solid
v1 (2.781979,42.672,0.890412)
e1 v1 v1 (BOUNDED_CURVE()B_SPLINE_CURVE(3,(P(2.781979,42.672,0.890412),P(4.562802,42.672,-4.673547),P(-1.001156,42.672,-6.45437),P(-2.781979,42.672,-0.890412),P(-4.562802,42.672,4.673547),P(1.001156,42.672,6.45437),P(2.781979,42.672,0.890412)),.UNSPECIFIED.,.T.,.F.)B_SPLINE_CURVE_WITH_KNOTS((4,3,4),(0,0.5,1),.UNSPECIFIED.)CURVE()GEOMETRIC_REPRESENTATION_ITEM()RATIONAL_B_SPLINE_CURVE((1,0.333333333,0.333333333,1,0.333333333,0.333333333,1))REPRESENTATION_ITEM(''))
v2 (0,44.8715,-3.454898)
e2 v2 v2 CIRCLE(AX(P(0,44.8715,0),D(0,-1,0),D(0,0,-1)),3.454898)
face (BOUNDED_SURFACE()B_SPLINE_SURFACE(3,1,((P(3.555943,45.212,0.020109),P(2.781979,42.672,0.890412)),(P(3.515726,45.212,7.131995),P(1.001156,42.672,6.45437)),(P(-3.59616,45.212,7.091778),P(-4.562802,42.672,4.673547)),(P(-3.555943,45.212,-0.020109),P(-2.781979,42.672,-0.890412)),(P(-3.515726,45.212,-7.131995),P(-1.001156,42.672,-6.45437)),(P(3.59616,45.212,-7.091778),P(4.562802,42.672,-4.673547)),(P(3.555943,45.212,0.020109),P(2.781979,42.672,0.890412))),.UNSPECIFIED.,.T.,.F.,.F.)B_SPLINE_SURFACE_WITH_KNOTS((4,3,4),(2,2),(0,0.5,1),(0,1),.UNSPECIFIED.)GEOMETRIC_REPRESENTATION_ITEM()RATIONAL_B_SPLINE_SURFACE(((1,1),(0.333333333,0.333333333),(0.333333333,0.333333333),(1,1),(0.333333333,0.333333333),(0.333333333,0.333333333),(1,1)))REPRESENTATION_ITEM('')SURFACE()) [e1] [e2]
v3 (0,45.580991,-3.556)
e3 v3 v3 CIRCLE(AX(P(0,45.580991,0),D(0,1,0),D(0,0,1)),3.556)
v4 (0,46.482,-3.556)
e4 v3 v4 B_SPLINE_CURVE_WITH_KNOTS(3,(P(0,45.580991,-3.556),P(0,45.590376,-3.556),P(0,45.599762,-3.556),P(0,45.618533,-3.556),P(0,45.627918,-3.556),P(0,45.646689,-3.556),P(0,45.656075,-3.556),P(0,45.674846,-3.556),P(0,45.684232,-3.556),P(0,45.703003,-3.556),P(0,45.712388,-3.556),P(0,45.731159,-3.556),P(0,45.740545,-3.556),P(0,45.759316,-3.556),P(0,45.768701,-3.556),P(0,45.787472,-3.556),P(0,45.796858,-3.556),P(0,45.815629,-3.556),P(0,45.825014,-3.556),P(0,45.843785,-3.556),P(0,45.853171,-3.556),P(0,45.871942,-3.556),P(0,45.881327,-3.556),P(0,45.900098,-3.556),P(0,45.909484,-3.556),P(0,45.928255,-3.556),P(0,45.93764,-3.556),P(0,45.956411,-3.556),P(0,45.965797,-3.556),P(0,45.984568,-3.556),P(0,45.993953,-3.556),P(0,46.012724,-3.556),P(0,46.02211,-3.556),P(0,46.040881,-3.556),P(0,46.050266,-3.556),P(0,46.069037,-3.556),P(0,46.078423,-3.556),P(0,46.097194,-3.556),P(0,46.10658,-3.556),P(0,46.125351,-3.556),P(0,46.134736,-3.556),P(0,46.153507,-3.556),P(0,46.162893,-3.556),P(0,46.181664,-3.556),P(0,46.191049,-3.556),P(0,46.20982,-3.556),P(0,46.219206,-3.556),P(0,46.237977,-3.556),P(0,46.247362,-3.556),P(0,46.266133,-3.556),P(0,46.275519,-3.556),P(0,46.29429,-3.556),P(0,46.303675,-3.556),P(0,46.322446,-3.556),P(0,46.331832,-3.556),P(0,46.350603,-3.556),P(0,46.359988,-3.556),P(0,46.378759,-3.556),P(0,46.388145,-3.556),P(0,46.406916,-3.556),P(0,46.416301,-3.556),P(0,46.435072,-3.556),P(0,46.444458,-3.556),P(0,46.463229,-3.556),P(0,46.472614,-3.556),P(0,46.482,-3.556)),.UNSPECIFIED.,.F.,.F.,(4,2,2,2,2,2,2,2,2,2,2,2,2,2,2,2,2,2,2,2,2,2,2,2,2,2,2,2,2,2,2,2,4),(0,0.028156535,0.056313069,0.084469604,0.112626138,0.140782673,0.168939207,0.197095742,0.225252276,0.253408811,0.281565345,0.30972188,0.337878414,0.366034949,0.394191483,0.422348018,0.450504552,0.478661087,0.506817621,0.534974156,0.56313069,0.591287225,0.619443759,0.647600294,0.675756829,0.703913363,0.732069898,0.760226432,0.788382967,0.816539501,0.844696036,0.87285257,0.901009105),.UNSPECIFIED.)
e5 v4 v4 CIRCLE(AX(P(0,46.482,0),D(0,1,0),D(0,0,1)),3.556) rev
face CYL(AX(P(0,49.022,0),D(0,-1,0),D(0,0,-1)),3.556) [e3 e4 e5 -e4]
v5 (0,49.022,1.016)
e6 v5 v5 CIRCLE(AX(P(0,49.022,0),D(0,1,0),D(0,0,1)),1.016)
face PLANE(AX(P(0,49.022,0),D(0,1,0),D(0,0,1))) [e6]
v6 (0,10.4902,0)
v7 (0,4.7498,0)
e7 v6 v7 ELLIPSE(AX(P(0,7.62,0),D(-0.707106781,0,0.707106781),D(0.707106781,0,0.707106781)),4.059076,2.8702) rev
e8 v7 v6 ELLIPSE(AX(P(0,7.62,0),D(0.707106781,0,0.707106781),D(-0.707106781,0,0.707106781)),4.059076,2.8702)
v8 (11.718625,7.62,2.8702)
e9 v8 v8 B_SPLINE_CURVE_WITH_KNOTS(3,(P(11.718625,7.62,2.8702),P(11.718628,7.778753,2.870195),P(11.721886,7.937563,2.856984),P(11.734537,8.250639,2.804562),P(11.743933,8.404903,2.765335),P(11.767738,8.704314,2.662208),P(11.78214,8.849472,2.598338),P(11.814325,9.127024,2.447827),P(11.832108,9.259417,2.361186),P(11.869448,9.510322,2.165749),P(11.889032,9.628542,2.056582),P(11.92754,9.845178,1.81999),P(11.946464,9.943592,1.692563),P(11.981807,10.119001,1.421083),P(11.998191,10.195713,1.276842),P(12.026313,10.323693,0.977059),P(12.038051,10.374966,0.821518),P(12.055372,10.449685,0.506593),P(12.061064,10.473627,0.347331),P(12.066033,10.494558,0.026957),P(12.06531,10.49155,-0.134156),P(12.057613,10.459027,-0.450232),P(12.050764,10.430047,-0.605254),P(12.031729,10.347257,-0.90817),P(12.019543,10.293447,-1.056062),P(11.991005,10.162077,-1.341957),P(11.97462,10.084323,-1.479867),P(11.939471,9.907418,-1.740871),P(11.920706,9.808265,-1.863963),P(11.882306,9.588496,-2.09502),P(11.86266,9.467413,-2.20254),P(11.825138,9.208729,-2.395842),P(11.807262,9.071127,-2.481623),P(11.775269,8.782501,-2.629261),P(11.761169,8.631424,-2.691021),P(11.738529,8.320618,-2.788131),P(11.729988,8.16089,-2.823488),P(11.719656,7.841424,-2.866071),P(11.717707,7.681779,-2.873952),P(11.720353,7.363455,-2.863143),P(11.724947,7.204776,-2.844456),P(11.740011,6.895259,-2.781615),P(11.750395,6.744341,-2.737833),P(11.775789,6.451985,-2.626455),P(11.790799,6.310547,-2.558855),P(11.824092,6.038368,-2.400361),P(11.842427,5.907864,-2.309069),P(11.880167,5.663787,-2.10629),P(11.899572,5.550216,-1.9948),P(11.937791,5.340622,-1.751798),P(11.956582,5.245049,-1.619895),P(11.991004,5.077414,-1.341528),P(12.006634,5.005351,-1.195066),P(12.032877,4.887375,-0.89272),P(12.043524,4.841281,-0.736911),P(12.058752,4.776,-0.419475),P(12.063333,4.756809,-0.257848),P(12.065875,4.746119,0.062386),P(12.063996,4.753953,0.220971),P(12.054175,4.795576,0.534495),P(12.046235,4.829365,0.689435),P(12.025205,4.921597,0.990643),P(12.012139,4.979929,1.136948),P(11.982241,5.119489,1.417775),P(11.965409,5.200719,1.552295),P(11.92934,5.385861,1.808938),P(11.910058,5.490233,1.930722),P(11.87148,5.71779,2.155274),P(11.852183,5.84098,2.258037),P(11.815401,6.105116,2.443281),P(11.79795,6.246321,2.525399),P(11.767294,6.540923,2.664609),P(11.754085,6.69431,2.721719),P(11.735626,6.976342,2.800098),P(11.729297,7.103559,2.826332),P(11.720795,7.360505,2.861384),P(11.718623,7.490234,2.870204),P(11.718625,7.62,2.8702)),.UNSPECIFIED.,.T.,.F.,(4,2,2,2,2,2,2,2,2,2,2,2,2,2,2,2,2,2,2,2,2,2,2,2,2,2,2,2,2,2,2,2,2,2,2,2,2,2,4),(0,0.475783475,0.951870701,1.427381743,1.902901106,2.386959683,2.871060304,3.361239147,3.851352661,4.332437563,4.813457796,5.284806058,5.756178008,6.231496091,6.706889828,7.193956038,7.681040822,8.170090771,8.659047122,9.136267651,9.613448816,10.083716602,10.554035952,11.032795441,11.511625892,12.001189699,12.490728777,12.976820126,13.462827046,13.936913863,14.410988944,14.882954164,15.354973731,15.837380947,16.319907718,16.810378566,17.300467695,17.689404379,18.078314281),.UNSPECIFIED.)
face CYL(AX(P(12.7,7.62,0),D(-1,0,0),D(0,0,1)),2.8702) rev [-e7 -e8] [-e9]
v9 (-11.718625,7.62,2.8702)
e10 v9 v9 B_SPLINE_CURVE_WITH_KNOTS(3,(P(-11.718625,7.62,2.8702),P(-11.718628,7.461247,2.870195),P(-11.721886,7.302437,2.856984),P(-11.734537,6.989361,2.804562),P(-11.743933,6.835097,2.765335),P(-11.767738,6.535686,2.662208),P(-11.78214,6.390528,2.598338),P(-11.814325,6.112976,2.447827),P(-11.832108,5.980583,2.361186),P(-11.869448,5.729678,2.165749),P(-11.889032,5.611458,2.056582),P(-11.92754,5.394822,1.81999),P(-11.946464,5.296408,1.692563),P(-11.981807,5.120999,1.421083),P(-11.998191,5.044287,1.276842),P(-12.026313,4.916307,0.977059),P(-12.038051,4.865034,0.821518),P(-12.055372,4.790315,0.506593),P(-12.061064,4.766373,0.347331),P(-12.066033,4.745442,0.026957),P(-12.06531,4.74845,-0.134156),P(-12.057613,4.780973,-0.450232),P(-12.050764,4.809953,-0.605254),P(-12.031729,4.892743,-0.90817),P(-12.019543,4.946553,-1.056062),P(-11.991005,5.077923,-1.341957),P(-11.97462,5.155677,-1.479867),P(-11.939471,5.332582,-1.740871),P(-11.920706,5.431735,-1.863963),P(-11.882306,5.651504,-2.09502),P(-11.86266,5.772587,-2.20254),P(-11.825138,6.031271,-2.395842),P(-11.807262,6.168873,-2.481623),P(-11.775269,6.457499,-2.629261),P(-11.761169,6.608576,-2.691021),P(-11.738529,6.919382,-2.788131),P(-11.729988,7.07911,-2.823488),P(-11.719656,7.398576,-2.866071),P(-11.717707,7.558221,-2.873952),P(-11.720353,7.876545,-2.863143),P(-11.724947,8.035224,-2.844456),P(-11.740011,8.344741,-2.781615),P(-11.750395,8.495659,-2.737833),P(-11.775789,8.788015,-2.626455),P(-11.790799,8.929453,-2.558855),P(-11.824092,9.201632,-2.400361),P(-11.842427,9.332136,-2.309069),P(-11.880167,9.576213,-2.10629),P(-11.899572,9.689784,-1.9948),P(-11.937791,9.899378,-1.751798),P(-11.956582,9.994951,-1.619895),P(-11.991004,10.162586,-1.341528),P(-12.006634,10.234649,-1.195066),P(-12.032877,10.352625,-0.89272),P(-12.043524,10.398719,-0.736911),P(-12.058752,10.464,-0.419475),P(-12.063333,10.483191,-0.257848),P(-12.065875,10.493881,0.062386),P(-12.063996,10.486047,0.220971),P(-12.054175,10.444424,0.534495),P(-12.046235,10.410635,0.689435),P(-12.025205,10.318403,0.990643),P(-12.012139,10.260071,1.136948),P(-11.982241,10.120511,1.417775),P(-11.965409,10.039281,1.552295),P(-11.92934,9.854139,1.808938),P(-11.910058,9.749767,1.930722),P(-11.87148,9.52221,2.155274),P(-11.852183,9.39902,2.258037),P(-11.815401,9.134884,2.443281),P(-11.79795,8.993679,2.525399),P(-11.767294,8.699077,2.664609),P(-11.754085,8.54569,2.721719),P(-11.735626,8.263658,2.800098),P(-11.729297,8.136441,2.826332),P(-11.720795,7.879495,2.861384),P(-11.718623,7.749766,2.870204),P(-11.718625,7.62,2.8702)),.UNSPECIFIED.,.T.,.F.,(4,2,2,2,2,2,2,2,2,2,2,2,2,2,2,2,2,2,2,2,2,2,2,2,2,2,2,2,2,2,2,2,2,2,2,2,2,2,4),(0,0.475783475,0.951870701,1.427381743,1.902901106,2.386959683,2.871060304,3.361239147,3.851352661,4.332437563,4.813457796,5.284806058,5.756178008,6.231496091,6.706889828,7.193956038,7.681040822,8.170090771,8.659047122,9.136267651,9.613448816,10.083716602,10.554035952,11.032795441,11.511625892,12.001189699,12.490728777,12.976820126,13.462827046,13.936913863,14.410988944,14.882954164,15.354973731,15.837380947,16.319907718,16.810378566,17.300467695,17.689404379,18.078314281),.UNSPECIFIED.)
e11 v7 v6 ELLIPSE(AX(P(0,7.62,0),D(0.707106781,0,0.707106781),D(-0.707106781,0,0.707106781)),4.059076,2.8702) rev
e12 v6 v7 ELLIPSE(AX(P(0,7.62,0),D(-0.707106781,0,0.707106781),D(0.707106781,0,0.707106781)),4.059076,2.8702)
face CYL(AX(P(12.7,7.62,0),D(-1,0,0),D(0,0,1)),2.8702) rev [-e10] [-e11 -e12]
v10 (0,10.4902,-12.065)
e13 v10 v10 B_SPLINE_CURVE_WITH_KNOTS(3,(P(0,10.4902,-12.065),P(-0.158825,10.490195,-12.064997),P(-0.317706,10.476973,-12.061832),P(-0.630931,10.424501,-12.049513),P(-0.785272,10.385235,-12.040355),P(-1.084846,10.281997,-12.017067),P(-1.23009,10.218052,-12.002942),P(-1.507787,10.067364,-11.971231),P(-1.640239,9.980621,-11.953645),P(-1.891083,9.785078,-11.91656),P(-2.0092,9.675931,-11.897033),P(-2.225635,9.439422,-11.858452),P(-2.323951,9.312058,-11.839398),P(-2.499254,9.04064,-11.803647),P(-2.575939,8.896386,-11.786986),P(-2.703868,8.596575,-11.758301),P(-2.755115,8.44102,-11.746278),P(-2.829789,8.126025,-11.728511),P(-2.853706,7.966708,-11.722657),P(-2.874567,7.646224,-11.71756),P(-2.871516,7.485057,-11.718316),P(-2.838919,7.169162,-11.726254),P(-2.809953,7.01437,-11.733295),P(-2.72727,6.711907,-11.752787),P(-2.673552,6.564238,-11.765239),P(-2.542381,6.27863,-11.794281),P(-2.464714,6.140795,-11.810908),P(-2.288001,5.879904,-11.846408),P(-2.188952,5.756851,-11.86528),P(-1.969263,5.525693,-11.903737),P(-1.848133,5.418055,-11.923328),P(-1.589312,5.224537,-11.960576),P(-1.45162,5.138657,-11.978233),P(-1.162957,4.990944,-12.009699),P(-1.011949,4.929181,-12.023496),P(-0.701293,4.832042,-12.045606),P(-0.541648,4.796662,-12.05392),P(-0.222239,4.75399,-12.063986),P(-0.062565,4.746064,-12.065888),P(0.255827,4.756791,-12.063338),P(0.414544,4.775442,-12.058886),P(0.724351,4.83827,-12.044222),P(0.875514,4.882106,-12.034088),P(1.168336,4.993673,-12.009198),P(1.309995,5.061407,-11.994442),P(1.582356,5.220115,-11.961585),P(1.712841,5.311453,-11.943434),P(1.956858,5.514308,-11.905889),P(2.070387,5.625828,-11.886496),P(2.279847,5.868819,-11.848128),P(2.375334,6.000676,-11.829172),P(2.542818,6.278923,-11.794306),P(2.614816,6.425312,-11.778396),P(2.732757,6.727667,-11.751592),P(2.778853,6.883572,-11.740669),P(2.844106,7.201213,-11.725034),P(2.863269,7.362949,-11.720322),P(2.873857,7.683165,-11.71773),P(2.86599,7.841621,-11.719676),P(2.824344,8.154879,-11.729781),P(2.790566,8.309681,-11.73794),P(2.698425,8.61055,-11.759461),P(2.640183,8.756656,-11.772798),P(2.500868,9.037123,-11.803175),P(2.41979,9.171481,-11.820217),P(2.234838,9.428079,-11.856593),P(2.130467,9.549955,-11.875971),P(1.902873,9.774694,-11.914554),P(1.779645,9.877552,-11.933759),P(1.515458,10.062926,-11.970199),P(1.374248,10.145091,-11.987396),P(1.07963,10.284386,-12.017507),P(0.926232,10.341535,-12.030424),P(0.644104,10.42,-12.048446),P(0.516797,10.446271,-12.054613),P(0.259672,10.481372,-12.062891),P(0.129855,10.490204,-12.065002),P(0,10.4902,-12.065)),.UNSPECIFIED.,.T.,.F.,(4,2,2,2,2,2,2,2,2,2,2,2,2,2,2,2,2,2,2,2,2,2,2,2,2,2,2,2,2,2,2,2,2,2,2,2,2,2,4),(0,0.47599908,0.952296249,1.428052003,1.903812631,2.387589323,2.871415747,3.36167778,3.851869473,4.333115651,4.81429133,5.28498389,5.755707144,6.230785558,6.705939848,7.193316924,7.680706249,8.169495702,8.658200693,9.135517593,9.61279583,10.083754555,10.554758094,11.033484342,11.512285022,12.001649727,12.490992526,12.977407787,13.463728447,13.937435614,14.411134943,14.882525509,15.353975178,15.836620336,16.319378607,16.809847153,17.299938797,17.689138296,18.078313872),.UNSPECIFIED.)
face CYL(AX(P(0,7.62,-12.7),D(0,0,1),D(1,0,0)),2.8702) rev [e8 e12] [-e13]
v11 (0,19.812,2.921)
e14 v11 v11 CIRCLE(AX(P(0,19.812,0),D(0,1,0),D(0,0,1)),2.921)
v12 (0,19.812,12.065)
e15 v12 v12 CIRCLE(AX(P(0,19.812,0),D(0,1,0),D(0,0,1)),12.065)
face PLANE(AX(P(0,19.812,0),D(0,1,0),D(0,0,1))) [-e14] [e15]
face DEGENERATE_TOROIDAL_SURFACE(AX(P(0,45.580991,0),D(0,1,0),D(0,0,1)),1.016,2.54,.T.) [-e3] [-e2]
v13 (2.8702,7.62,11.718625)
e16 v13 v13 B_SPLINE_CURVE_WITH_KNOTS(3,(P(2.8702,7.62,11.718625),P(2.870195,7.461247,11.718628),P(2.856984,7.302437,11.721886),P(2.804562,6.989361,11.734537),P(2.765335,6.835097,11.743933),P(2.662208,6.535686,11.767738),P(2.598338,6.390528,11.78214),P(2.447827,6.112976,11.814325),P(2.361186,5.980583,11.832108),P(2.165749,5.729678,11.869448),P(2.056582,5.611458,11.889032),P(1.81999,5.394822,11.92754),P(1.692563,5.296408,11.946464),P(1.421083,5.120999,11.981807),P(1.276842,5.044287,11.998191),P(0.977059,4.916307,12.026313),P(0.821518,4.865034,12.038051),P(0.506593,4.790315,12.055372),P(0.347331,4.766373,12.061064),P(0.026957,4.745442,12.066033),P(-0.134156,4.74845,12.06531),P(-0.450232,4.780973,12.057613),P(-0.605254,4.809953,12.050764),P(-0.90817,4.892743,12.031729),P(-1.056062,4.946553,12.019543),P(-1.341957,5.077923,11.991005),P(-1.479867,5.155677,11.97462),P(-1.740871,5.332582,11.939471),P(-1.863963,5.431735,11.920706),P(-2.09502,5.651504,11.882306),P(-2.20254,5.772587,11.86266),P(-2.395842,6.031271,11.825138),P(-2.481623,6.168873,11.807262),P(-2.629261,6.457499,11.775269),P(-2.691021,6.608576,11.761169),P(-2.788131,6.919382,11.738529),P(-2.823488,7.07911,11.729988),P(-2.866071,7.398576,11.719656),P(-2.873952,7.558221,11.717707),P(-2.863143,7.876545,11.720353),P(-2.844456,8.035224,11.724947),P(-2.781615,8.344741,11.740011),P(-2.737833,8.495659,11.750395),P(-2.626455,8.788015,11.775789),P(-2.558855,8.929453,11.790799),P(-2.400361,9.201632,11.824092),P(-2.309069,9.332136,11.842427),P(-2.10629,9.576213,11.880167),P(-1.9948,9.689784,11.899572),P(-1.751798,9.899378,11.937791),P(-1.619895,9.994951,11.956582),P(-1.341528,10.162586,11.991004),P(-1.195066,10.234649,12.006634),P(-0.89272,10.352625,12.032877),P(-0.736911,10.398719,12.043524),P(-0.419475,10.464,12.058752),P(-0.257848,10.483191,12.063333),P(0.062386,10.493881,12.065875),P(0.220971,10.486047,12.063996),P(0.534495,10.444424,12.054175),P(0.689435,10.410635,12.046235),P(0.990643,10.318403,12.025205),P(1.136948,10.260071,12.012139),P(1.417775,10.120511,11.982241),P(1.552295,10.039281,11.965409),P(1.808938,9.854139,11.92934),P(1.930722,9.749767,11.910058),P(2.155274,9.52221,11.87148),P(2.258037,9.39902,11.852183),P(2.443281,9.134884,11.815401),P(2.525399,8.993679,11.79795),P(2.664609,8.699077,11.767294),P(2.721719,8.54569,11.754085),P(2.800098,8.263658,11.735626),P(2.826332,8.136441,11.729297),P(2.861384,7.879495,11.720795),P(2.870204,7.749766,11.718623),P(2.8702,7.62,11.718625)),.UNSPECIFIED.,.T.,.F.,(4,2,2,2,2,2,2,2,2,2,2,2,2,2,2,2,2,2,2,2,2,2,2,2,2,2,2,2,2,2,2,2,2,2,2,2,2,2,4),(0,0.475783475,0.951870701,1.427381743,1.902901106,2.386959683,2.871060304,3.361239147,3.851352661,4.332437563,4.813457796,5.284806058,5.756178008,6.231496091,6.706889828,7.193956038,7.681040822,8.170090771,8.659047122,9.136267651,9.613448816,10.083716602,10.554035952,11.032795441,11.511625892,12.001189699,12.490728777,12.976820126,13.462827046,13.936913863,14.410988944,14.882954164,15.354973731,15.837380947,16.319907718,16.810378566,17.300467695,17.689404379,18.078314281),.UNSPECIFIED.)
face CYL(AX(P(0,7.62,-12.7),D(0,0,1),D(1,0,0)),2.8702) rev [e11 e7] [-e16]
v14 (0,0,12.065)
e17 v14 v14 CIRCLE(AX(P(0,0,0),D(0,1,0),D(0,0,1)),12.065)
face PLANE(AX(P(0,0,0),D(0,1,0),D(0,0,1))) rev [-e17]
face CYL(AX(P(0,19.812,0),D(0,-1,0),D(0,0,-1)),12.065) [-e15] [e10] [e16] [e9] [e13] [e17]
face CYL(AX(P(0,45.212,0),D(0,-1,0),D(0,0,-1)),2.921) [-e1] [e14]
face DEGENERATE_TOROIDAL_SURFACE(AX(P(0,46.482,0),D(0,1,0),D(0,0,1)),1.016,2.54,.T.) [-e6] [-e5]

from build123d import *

# Parameters (mm, degrees)
SKETCH1_R           = 12.065
BOSS_EXTRUDE1_DEPTH = 19.812
SKETCH2_R           = 2.921
BOSS_EXTRUDE2_DEPTH = 25.4
SKETCH3_R           = 3.556
BOSS_EXTRUDE3_DEPTH = 3.81
FILLET3_R           = 2.54
SKETCH7_R           = 2.8702
CUT_EXTRUDE1_DEPTH  = 12.7
CIRPATTERN1_COUNT   = 2
CIRPATTERN1_ANGLE   = 90
FILLET4_R           = 2.54


with BuildPart() as part:
    # Sketch1 → Boss-Extrude1 (new body)
    with BuildSketch(Plane(origin=(0, 0, 0), x_dir=(1, 0, 0), z_dir=(0, 1, 0))):
        with Locations(Location((0, 0, 0), (0, 0, 270))):
            Circle(SKETCH1_R)
    extrude(amount=BOSS_EXTRUDE1_DEPTH)

    # Sketch2 → Boss-Extrude2 (add)
    with BuildSketch(Plane(origin=(0, 19.812, 0), x_dir=(1, 0, 0), z_dir=(0, 1, 0))):
        with Locations(Location((0, 0, 0), (0, 0, 270))):
            Circle(SKETCH2_R)
    extrude(amount=BOSS_EXTRUDE2_DEPTH)

    # Sketch3 → Boss-Extrude3 (add)
    with BuildSketch(Plane(origin=(0, 45.212, 0), x_dir=(1, 0, 0), z_dir=(0, 1, 0))):
        with Locations(Location((0, 0, 0), (0, 0, 90))):
            Circle(SKETCH3_R)
    extrude(amount=BOSS_EXTRUDE3_DEPTH)

    # Fillet3
    fillet3_edges = [part.edges().sort_by_distance(p)[0] for p in [
        (0, 49.022, 3.556),
    ]]
    fillet(fillet3_edges, radius=FILLET3_R)

    # Sketch7 → Cut-Extrude1 (cut, symmetric)
    with BuildSketch(Plane.XY):
        with Locations(Location((0, 7.62, 0), (0, 0, 90.000000025))):
            Circle(SKETCH7_R)
    cut_extrude1 = extrude(amount=CUT_EXTRUDE1_DEPTH, both=True, mode=Mode.SUBTRACT)

    # CirPattern1: Cut-Extrude1 ×2 about axis
    cirpattern1_axis = Axis((0, 45.212, 0), (0, -1, 0))
    for i in range(1, CIRPATTERN1_COUNT):
        add(cut_extrude1.rotate(cirpattern1_axis, i * CIRPATTERN1_ANGLE / (CIRPATTERN1_COUNT - 1)), mode=Mode.SUBTRACT)

    # Loft1: read off the stored shape, not the designer's step
    # Loft1: loft between two sections, ruled curve by curve
    loft1_from = [
        Edge.make_bspline([(3.555943144, 45.212, 0.020108599), (3.515725946, 45.212, 7.131994887), (-3.596160342, 45.212, 7.091777689), (-3.555943144, 45.212, -0.020108599), (-3.515725946, 45.212, -7.131994887), (3.596160342, 45.212, -7.091777689), (3.555943144, 45.212, 0.020108599)], [0, 0, 0, 0, 0.5, 0.5, 0.5, 1, 1, 1, 1], 3, [1, 0.333333333, 0.333333333, 1, 0.333333333, 0.333333333, 1]),
    ]
    loft1_to = [
        Edge.make_bspline([(2.781979214, 42.672, 0.890411509), (1.001156196, 42.672, 6.454369936), (-4.562802231, 42.672, 4.673546919), (-2.781979214, 42.672, -0.890411509), (-1.001156196, 42.672, -6.454369936), (4.562802231, 42.672, -4.673546919), (2.781979214, 42.672, 0.890411509)], [0, 0, 0, 0, 0.5, 0.5, 0.5, 1, 1, 1, 1], 3, [1, 0.333333333, 0.333333333, 1, 0.333333333, 0.333333333, 1]),
    ]
    loft1 = Solid(Shell([*[Face.make_surface_from_curves(loft1_from[k], loft1_to[k]) for k in range(1)], Face(Wire(loft1_from)), Face(Wire(loft1_to))]))
    add(loft1)

    # Fillet4
    fillet4_edges = [part.edges().sort_by_distance(p)[0] for p in [
        (-2.521571155, 45.212, 2.507352171),
    ]]
    fillet(fillet4_edges, radius=FILLET4_R)


solid = part.part
